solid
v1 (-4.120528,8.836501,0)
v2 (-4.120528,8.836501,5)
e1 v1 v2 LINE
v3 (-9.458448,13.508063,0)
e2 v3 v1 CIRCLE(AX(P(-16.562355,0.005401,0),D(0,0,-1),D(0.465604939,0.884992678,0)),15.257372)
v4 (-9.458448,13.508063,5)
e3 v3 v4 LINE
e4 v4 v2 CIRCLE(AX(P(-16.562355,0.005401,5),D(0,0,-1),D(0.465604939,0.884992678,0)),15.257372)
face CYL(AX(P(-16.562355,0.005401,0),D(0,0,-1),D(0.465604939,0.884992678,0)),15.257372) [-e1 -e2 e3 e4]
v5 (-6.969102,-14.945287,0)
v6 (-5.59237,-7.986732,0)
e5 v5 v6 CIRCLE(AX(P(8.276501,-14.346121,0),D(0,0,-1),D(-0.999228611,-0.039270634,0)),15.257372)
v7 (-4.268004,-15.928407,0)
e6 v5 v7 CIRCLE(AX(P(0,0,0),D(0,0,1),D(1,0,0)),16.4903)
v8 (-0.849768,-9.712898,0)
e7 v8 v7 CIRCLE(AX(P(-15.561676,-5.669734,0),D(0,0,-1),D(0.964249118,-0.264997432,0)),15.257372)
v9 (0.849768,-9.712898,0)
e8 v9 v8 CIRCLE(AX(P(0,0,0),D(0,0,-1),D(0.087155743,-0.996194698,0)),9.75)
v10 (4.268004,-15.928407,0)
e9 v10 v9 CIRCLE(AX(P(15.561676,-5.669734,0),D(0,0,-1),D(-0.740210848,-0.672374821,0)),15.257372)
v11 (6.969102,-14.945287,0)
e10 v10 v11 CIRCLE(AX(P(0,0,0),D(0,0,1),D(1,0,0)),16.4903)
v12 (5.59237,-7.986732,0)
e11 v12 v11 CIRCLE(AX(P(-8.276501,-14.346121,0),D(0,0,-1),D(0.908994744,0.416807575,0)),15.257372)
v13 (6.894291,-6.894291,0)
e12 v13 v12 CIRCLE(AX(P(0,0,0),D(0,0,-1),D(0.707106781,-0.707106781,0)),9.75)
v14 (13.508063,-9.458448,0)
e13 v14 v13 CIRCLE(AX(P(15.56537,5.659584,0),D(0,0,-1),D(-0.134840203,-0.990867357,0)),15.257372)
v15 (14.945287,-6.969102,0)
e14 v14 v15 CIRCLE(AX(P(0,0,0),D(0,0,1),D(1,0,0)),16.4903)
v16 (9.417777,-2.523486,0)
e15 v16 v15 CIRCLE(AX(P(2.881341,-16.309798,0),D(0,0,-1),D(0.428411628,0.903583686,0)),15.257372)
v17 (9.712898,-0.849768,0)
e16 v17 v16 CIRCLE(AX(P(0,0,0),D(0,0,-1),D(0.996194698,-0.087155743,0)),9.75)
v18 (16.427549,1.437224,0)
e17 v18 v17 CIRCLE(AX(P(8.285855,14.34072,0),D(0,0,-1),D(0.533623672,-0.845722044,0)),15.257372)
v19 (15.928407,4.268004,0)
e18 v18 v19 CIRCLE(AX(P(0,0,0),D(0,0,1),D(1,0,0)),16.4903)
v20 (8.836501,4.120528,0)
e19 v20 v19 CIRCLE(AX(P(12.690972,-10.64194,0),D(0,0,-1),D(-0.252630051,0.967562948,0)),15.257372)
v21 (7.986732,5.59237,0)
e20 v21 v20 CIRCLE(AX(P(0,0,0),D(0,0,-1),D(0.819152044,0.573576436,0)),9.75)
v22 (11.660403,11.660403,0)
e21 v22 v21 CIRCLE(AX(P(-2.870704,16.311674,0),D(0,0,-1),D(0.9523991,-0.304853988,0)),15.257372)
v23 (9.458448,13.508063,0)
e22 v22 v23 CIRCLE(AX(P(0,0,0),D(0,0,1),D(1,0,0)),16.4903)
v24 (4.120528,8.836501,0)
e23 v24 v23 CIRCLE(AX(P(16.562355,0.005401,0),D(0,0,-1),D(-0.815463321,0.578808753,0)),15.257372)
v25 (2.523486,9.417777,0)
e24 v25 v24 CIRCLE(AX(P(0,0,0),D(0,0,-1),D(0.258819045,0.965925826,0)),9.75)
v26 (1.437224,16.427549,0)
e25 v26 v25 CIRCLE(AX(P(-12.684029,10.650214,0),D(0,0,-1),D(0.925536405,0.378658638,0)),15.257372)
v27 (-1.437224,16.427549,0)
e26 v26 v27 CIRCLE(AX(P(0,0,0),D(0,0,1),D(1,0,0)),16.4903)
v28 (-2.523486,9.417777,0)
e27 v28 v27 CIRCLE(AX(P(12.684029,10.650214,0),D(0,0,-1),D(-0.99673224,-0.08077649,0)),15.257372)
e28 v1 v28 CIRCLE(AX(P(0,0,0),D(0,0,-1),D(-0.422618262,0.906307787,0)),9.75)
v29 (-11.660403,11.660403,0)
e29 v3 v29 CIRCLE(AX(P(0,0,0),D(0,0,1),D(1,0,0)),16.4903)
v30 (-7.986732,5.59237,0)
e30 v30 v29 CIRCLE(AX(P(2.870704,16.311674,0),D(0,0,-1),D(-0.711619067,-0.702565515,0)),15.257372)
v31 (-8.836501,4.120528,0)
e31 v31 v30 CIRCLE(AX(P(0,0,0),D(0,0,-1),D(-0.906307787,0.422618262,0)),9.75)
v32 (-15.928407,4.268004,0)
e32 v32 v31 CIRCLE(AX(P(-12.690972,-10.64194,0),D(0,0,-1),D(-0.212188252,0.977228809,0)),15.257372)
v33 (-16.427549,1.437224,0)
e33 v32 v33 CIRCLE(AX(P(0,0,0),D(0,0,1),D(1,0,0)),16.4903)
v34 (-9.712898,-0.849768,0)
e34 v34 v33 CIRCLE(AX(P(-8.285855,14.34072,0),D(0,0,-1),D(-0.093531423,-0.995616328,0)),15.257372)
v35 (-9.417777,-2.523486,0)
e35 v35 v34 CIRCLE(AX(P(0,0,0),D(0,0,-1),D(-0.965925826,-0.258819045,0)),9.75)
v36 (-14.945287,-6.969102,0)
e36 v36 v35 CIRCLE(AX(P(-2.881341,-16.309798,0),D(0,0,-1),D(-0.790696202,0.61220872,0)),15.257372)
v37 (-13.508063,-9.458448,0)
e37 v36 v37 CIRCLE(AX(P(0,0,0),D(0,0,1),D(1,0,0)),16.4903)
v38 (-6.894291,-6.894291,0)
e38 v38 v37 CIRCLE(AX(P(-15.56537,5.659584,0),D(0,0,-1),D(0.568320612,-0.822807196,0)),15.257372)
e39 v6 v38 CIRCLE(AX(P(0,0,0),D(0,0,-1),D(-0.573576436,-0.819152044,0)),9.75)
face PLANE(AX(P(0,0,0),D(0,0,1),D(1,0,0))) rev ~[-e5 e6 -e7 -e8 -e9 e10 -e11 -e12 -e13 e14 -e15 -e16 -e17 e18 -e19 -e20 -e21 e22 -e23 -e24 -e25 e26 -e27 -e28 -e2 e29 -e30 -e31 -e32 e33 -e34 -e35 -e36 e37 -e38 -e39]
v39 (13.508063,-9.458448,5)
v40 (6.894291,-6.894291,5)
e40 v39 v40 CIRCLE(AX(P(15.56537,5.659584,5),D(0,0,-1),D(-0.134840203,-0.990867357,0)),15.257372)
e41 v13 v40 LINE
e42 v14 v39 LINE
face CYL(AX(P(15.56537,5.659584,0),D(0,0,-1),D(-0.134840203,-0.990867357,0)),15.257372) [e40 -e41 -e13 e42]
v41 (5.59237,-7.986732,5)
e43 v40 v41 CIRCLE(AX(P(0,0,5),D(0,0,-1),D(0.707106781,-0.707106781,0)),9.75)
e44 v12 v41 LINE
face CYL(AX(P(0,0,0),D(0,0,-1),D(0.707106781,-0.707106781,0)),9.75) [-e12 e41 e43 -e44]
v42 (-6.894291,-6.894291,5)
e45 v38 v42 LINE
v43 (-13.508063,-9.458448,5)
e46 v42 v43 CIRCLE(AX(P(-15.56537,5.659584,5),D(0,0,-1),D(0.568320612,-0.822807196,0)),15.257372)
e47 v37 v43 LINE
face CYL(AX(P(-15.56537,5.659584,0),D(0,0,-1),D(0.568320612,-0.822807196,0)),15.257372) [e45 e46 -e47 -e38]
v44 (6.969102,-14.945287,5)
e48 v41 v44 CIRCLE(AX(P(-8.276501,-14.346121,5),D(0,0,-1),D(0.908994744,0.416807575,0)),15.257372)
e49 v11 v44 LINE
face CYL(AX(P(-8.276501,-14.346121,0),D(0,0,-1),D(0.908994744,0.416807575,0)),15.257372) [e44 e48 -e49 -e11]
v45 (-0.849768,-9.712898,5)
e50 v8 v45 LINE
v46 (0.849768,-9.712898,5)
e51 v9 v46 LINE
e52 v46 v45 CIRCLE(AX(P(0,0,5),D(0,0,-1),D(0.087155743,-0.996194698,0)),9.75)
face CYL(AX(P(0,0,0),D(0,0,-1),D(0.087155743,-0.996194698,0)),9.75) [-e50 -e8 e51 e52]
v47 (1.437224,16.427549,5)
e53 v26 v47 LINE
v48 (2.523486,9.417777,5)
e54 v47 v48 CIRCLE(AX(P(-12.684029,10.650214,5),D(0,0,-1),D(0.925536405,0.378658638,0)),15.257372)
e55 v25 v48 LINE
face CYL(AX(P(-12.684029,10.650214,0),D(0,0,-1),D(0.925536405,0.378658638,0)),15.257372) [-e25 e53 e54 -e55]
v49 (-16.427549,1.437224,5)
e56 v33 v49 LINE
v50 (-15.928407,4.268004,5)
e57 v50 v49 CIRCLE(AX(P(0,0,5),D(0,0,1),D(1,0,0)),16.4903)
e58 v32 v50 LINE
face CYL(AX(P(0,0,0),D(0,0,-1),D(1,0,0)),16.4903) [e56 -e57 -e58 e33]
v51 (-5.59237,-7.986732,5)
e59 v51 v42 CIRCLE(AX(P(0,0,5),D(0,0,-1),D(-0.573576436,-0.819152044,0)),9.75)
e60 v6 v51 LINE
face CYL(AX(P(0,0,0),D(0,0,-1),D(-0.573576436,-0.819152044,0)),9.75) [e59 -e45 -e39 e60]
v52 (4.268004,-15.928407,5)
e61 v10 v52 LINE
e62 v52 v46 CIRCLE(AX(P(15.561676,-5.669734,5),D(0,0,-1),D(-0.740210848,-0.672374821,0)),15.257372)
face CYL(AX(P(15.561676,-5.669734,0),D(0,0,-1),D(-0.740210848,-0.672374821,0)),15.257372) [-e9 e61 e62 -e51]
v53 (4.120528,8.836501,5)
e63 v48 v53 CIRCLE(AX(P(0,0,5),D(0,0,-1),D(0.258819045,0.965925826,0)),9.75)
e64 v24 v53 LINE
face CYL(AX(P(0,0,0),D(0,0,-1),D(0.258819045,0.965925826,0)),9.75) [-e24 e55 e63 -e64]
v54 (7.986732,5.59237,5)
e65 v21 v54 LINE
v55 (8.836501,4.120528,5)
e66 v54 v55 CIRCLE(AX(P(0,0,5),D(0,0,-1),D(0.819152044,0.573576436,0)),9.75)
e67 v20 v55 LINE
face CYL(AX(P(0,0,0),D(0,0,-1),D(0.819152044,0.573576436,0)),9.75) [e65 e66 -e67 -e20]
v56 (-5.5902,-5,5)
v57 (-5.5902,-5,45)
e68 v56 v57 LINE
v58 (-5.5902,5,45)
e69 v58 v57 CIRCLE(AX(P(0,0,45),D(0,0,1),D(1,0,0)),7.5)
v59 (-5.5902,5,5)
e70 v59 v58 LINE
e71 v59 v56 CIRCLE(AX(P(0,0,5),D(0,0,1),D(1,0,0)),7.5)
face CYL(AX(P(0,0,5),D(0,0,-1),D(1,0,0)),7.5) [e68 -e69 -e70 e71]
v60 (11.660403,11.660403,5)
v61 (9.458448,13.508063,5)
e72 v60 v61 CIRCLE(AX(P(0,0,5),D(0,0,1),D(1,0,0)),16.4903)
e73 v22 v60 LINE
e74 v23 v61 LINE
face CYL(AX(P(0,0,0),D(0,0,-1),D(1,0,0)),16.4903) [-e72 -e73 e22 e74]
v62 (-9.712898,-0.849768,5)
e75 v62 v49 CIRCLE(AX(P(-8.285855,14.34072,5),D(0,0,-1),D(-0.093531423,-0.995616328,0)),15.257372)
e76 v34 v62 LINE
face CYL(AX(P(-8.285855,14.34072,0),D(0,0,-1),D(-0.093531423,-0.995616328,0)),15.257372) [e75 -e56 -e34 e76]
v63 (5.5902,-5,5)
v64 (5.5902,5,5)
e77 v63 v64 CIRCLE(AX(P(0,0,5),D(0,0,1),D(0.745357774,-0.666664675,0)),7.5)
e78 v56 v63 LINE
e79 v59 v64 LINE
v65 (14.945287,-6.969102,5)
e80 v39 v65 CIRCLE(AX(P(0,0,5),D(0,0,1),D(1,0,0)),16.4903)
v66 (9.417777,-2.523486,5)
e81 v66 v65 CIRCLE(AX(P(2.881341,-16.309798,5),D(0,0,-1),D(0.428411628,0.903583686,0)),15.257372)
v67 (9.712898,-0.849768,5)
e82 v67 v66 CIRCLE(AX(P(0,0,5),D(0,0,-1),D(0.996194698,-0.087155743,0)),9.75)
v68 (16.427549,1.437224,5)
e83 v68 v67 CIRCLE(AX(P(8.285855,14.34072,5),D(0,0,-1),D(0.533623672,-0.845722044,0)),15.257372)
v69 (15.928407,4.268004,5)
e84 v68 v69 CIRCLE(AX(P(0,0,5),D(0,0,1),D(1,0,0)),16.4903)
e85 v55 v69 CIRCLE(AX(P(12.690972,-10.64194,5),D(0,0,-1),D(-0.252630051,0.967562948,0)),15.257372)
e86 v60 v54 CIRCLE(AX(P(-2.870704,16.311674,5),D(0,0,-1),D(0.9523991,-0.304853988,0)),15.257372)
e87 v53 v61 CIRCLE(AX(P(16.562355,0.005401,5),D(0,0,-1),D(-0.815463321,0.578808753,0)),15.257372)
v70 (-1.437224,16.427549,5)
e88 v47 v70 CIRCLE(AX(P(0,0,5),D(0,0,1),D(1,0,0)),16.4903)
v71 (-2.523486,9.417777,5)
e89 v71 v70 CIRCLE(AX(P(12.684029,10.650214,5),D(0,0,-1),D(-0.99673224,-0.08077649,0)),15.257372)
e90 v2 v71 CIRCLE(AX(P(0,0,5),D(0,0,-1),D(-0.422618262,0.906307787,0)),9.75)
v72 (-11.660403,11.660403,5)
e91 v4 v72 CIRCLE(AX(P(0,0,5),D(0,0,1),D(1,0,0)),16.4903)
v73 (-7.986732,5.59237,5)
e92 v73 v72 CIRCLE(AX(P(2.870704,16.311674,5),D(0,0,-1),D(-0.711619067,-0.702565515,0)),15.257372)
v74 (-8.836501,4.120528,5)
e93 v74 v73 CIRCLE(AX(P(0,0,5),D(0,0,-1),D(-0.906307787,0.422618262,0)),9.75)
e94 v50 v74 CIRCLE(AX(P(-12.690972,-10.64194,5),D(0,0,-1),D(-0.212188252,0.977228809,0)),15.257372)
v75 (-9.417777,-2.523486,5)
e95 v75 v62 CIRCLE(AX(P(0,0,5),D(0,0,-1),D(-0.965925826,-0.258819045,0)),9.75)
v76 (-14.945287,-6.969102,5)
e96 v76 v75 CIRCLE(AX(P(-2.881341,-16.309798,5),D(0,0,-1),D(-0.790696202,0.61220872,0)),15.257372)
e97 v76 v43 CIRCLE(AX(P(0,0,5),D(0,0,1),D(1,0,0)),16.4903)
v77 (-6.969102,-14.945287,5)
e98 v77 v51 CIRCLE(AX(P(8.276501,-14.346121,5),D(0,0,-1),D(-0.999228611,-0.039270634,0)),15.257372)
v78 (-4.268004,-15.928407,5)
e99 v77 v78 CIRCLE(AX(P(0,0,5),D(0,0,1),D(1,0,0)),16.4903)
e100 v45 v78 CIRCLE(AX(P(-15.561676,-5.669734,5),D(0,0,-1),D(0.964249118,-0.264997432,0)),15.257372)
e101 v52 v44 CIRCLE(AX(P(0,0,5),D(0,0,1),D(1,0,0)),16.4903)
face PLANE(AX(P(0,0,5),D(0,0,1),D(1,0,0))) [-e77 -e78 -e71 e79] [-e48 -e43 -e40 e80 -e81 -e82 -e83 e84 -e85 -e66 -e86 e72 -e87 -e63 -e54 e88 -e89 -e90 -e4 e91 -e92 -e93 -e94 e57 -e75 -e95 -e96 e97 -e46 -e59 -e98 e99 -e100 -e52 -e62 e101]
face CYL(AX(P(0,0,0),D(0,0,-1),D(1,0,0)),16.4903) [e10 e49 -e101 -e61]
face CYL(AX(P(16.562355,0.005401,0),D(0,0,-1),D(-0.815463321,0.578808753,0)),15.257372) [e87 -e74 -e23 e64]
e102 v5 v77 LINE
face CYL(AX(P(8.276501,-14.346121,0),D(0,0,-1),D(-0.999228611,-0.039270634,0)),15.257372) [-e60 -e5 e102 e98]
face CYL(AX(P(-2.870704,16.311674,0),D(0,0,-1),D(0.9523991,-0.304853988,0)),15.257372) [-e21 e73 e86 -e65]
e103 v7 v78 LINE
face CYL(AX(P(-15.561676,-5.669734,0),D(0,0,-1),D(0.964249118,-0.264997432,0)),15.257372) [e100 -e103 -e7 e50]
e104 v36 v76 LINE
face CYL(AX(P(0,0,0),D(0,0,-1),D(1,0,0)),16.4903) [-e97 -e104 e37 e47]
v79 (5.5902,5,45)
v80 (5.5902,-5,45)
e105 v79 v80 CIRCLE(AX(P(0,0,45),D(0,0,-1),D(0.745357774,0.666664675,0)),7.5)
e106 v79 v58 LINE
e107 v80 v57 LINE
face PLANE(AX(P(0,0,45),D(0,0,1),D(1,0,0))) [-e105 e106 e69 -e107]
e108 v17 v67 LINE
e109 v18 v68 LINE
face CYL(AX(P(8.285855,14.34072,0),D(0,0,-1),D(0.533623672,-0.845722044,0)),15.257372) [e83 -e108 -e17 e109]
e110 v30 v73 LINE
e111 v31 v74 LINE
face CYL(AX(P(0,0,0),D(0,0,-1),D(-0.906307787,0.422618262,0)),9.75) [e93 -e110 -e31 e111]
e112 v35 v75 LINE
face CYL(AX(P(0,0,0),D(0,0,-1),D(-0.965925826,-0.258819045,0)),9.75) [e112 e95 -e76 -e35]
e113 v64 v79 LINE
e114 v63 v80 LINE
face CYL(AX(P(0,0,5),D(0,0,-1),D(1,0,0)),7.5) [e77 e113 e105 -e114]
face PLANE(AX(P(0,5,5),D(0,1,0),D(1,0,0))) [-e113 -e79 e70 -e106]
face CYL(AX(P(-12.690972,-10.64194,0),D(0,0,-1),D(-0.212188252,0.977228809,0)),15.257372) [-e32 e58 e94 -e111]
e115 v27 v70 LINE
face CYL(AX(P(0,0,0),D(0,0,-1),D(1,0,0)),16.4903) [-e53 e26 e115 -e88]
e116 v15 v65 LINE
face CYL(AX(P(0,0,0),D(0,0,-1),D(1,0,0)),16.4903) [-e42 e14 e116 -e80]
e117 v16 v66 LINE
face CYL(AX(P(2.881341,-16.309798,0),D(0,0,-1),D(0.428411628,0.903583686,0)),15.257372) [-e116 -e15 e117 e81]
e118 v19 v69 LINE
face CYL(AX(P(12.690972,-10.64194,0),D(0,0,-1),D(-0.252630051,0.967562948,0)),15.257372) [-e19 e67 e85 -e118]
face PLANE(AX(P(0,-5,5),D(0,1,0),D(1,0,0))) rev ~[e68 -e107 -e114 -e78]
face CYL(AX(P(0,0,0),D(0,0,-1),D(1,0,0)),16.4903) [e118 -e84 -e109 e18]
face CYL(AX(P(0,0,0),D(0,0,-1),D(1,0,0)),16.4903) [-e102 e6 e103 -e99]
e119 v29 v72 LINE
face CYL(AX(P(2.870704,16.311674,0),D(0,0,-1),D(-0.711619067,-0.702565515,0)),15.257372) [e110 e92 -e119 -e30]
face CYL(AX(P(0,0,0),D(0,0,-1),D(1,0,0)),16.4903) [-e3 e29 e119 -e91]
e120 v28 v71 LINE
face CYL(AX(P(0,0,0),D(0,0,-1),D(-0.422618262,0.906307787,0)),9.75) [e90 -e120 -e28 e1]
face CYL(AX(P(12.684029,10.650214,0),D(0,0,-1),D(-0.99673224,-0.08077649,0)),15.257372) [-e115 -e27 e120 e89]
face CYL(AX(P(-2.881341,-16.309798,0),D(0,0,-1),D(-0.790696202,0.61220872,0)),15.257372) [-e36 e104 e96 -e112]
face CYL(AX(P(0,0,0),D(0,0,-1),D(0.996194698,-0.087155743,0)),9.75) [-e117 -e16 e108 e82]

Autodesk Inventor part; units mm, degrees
sketch "Sketch1" plane through (0, 0, 0) normal (0, 0, 1) x (1, 0, 0)
  circle A0 centre (0, 0) radius 16.4903
  dimension "d0" = 32.9806
extrude "Extrusion1" add sketch "Sketch1" along normal blind 5
ref_plane "Work Plane2" through (0, 0, 2.5) normal (0, 0, 1) x (1, 0, 0)
sketch "Sketch2" plane through (0, 0, 0) normal (0, 0, -1) x (-1, 0, 0)
  circle A0 centre (0, 0) radius 16.4903 projected
  circle A1 centre (0, 0) radius 13.5855
  dimension "d3" = 27.171
surface extrude "Pitch Diameter" sketch "Sketch2" against normal through all shown no curves A1
ref_plane "Work Plane8" through (0, 0, 0) normal (0.9396926, 0.3420201, 0) x (0, 0, 1)
ref_plane "Work Plane9" through (0, 0, 0) normal (1, 0, 0) x (0, 1, 0)
spur gear teeth "Spur Gear" teeth 9 pitch diameter 27 tip diameter 32.9806 root diameter 19.5 face width 5 start plane through (0, 0, 0) normal (0, 0, -1) x (-1, 0, 0)
sketch "Sketch3" plane through (0, 0, 5) normal (0, 0, 1) x (1, 0, 0)
  circle A0 centre (0, 0) radius 7.5
  line L0 (0, 0) -> (0, 5)
  line L1 (0, 5) -> (-5.5902, 5)
  line L2 (0, 5) -> (5.5902, 5)
  line L3 (0, 0) -> (0, -5)
  line L4 (0, -5) -> (5.5902, -5)
  line L5 (0, -5) -> (-5.5902, -5)
  dimension "d49" = 15
  dimension "d50" = 5
  dimension "d51" = 5
extrude "Extrusion2" add sketch "Sketch3" along normal blind 40 contours A0 L4 L3 L0 L2 | L1 L0 L3 L5 A0
equation "\"d0\" = da_da"
equation "\"d1\" = da_b"
equation "\"d3\" = da_dw"
equation "\"d16\" = da_aw"
equation "\"d43\" = da_aw"
equation "\"d46\" = da_aw"
equation "\"da_da\" = 32.980581"
equation "\"da_b\" = 5"
equation "\"da_dw\" = 27.170952"
equation "\"da_aw\" = 164.535212"
properties part number "Drive_Spur" material "Steel"
